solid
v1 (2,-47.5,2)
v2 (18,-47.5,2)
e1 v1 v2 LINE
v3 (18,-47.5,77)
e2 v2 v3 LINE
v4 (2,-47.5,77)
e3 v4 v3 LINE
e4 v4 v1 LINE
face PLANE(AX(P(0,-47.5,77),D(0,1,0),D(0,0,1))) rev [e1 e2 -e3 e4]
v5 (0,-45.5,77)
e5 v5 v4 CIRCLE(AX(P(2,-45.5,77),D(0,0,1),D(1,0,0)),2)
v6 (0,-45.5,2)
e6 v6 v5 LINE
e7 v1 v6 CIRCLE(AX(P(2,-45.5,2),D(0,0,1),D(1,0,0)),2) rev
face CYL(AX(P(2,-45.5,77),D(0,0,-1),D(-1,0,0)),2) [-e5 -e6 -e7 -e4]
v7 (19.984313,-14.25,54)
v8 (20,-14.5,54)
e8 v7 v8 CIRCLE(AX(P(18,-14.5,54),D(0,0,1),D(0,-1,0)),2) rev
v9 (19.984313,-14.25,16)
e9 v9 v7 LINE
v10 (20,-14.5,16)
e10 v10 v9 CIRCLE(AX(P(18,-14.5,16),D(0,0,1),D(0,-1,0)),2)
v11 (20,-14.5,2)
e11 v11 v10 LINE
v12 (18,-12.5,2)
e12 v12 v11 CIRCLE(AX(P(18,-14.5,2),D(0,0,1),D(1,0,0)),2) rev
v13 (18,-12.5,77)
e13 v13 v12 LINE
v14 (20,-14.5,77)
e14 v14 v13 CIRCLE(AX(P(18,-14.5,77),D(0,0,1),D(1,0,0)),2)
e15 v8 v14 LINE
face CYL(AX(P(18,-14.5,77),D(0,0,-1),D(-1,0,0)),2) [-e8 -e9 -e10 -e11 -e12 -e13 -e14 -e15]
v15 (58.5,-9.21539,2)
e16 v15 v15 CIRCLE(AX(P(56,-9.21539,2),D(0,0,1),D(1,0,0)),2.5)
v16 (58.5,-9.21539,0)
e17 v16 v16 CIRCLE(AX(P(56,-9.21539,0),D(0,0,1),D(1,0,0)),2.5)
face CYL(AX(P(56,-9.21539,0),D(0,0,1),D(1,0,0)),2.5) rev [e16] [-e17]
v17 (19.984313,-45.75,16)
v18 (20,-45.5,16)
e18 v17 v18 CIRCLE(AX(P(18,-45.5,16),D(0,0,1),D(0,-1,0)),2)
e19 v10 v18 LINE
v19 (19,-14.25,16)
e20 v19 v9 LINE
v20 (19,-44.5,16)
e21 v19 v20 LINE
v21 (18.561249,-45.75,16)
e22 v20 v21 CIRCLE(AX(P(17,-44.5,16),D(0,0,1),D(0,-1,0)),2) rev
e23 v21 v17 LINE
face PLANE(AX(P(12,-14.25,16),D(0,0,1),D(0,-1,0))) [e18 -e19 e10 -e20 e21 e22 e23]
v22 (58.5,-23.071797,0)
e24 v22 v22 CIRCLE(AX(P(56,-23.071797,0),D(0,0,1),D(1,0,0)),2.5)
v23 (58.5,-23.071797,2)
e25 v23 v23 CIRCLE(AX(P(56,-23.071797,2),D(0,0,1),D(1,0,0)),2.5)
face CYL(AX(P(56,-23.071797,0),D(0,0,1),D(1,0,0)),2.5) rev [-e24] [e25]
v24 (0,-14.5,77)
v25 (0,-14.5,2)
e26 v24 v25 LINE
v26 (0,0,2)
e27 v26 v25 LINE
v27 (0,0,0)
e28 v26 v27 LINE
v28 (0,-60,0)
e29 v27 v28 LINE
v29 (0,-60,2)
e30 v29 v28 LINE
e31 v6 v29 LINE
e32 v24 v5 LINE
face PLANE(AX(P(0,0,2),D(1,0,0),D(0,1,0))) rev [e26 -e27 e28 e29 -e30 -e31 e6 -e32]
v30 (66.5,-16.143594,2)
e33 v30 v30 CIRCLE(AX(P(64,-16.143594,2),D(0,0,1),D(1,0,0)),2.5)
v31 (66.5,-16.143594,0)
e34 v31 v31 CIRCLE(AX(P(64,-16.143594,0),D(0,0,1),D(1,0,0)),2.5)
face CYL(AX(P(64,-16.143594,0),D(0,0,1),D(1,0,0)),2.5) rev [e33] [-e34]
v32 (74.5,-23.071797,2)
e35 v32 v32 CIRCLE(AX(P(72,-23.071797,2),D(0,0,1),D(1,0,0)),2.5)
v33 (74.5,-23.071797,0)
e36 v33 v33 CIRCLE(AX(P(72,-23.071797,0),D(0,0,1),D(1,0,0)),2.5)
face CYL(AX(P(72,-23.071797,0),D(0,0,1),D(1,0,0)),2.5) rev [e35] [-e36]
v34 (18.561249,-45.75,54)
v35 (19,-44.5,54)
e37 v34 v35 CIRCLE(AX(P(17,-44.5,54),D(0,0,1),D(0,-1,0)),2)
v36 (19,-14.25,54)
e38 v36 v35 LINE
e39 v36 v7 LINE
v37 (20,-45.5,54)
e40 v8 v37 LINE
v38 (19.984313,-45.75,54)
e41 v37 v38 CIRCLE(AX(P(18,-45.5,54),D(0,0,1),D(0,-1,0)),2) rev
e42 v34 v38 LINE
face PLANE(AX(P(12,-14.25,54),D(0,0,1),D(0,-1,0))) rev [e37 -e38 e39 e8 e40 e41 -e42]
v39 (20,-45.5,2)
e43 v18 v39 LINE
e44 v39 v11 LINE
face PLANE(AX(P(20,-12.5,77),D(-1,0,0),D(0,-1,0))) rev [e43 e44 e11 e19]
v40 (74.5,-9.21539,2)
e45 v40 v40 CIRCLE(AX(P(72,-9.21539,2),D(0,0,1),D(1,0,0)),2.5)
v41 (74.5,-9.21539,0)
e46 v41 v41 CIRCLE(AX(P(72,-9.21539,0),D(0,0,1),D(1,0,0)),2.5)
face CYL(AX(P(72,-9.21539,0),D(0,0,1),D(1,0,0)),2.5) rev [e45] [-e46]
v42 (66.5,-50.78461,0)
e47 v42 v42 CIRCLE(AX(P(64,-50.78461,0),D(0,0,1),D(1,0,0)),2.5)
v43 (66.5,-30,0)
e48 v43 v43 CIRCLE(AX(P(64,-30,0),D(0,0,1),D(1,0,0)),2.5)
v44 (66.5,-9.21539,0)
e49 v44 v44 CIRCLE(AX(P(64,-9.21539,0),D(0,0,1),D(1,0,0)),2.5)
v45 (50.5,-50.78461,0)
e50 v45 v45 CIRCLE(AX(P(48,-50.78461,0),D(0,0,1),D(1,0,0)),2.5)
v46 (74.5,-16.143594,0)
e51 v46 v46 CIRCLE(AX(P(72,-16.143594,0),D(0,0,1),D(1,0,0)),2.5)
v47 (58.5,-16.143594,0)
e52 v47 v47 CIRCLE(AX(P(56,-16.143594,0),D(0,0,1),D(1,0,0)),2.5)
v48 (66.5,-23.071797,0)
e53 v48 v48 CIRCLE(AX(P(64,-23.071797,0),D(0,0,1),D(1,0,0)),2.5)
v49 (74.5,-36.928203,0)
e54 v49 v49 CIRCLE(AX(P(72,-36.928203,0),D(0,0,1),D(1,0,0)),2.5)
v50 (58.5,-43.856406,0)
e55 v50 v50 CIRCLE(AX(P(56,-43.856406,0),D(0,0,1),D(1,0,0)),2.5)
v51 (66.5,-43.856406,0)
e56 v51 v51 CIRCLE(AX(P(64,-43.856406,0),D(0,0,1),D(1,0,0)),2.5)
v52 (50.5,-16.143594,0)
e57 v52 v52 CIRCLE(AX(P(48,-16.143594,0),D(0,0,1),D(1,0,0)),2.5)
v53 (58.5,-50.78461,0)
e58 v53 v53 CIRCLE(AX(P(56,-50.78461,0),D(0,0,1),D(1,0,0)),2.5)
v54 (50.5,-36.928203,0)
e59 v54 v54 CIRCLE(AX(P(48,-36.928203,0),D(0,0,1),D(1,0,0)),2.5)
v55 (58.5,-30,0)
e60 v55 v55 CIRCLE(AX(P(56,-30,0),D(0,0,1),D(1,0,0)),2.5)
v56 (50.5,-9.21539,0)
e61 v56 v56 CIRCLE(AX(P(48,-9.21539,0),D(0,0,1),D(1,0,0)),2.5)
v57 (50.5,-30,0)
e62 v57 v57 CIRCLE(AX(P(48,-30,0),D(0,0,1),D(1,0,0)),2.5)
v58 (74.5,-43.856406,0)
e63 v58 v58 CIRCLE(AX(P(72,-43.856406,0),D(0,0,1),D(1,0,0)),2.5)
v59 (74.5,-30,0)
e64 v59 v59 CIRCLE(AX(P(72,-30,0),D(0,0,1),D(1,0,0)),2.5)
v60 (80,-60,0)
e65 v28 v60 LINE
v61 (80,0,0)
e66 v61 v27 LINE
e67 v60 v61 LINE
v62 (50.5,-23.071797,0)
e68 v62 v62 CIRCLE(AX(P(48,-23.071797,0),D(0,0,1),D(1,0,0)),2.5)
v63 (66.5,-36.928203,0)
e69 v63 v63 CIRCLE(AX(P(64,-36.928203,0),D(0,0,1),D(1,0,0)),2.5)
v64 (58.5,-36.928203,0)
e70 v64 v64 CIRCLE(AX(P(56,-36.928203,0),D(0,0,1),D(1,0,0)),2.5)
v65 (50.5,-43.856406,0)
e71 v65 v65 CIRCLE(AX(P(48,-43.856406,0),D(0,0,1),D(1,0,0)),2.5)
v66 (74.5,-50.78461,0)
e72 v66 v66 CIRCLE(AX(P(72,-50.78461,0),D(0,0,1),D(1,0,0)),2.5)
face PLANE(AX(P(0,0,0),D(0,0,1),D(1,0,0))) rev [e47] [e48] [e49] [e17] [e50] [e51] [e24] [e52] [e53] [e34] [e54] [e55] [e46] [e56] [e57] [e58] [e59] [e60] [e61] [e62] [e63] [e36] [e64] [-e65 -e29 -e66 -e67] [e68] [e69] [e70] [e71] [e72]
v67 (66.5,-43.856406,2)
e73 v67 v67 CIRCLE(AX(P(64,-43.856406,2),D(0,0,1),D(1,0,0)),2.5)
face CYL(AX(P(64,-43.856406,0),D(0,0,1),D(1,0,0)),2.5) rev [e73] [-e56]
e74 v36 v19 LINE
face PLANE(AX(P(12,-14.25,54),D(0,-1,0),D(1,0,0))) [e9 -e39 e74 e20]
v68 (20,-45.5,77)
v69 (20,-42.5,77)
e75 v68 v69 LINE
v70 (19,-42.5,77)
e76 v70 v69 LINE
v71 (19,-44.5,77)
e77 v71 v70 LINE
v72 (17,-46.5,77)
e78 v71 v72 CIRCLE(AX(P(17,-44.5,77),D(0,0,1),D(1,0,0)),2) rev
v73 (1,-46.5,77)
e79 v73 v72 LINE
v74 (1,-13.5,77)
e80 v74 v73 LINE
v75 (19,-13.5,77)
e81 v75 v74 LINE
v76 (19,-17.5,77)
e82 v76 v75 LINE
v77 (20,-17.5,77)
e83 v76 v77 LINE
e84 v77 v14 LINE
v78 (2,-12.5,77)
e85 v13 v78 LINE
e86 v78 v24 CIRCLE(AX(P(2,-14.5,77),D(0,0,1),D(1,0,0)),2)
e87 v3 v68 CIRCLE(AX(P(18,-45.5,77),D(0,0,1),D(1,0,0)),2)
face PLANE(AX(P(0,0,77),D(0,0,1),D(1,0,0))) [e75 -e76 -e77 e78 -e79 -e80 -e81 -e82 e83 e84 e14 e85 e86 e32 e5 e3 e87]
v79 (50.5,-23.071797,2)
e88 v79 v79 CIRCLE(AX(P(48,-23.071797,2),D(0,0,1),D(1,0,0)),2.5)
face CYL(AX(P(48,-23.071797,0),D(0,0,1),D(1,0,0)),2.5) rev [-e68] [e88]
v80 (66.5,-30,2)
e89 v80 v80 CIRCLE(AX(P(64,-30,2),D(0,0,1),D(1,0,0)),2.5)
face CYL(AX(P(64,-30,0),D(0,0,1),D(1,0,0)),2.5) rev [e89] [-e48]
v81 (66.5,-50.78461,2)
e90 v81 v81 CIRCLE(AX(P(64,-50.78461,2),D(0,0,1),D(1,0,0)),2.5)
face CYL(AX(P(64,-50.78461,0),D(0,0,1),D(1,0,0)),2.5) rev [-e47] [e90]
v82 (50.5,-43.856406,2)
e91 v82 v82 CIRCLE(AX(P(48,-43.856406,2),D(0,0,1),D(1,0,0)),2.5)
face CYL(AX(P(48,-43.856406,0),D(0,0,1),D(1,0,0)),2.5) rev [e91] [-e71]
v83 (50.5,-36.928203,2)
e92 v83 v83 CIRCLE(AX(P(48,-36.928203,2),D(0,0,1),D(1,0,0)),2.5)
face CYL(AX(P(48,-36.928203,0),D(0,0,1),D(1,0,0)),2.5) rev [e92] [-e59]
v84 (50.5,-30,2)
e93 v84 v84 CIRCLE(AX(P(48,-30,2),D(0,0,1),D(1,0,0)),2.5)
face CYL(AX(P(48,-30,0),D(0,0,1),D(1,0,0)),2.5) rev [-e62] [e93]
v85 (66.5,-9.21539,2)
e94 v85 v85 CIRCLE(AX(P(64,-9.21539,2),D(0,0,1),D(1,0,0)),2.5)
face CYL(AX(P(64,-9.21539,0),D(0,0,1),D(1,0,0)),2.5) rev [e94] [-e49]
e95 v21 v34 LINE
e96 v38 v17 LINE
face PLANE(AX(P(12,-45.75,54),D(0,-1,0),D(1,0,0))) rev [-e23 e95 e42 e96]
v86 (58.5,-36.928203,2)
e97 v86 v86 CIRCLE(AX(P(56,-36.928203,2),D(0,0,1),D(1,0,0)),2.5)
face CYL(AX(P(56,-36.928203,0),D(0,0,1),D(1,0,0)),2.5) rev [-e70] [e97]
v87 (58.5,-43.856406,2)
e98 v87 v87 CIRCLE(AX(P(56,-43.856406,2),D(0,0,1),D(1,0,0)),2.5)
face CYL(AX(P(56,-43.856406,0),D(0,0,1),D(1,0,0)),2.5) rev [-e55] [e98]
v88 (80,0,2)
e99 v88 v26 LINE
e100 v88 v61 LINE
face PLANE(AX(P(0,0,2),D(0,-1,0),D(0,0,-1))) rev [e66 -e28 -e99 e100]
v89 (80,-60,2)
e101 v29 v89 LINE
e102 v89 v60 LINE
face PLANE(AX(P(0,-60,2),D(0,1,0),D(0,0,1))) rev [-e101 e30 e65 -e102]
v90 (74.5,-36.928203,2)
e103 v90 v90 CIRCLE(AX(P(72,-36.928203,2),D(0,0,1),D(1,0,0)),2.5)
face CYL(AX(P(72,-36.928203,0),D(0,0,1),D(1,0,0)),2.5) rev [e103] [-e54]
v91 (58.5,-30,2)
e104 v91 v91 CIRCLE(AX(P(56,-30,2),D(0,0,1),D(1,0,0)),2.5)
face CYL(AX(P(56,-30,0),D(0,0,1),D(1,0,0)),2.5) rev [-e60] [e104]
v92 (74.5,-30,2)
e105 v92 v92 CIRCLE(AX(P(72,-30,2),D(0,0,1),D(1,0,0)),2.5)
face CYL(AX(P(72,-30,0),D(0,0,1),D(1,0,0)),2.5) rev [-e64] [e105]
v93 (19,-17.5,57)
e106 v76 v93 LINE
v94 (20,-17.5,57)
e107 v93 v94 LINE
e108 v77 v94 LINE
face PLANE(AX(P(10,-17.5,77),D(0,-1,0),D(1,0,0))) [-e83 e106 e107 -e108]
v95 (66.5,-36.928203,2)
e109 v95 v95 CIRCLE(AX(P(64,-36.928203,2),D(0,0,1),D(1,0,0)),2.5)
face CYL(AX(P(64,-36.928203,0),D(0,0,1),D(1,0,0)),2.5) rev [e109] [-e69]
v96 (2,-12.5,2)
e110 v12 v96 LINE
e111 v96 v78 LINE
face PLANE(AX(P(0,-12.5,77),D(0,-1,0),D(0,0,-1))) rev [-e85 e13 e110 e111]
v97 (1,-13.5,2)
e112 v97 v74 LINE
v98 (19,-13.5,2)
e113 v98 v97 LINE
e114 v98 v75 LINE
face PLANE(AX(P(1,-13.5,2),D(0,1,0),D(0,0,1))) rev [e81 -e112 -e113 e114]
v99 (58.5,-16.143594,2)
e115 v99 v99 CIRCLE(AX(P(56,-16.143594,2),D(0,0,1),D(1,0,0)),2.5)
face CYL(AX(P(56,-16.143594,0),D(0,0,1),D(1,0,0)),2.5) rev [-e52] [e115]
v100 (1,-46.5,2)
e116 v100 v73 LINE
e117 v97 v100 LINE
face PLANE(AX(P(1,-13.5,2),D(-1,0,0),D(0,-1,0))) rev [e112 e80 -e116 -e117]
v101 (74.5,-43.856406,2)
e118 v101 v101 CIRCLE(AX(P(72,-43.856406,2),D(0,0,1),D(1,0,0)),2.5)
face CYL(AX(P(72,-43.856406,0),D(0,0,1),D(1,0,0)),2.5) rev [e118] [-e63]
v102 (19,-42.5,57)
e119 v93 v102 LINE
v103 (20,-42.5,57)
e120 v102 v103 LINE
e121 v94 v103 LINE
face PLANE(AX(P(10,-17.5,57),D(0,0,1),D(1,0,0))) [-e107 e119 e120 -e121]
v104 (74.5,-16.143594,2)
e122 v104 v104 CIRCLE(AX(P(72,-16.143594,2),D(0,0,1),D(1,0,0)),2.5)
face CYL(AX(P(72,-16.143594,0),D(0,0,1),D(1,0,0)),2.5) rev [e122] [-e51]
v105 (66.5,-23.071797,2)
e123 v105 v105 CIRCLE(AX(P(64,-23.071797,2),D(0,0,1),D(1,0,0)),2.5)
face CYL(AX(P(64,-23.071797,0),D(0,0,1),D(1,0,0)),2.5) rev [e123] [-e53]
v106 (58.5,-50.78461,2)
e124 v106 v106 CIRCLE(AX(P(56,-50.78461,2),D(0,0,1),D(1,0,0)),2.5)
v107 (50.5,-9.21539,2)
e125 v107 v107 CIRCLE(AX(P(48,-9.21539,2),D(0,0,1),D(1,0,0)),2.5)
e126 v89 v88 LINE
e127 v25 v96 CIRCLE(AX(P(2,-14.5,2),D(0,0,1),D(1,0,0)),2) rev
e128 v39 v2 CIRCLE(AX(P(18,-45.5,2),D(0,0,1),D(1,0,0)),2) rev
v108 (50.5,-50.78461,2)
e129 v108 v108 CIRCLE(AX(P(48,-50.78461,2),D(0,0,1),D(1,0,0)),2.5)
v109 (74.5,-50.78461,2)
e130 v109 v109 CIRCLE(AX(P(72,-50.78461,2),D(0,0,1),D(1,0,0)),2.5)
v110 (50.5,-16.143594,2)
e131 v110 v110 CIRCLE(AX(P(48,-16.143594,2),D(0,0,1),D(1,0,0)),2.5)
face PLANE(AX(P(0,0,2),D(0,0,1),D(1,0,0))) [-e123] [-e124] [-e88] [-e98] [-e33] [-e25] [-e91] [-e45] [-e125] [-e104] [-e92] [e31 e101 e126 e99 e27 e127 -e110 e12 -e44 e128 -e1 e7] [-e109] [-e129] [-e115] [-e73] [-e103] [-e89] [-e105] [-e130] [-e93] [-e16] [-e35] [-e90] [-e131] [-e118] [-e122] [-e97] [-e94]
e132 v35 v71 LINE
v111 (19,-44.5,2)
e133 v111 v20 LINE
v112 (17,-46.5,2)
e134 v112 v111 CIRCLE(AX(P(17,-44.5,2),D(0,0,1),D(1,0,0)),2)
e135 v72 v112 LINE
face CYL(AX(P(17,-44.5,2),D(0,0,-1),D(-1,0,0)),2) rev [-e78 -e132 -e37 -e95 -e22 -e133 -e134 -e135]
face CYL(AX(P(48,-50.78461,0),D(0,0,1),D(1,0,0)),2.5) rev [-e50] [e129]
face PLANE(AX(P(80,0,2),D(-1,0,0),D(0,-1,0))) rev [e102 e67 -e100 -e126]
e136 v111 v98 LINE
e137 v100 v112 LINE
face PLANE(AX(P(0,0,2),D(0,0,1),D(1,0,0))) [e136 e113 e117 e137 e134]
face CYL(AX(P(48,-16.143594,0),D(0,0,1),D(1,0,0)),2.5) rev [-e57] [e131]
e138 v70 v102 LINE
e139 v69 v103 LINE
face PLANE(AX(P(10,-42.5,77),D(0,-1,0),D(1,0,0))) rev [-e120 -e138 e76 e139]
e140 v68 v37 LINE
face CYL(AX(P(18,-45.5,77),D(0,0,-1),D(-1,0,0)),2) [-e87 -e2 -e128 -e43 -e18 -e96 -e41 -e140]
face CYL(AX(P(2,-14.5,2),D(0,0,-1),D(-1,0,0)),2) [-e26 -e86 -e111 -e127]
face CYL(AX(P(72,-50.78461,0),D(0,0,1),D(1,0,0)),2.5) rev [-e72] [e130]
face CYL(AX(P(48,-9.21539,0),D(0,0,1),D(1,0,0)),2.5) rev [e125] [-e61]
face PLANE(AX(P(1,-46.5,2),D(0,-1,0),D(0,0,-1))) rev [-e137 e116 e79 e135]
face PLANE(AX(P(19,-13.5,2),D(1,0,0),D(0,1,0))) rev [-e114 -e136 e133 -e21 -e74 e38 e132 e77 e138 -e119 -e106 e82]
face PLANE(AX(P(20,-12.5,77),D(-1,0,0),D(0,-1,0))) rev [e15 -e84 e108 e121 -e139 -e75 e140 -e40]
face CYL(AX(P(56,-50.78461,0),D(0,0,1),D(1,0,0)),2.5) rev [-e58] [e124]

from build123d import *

# Parameters (mm, degrees)
SKETCH_1_W             = 80
SKETCH_1_H             = 60
EXTRUDE_1_DEPTH        = 2
SKETCH_3_R             = 2.5
HONEYCOMBCOOLING_DEPTH = 101.019998
SKETCH_4_W             = 20
SKETCH_4_H             = 35
EXTRUDE_2_DEPTH        = 75
SKETCH_5_W             = 18
SKETCH_5_H             = 33
CUT_EXTRUDE_3_DEPTH    = 75
SKETCH_6_W             = 38
SKETCH_6_H             = 31.5
CUT_EXTRUDE_4_DEPTH    = 8
SKETCH_9_W             = 20
SKETCH_9_H             = 25
CUT_EXTRUDE_5_DEPTH    = 10
FILLET_1_R             = 2
FILLET_2_R             = 2


with BuildPart() as part:
    # 草图1 → 凸台-拉伸1 (new body)
    with BuildSketch(Plane.XY):
        with Locations((40, -30)):
            Rectangle(SKETCH_1_W, SKETCH_1_H)
    extrude(amount=EXTRUDE_1_DEPTH)

    # 草图3 → HoneycombCooling (cut, through all)
    with BuildSketch(Plane.XY.offset(2)):
        with Locations((48, -50.784609691)):
            Circle(SKETCH_3_R)
        with Locations((56, -50.784609691)):
            Circle(SKETCH_3_R)
        with Locations((64, -50.784609691)):
            Circle(SKETCH_3_R)
        with Locations((72, -50.784609691)):
            Circle(SKETCH_3_R)
        with Locations((48, -43.856406461)):
            Circle(SKETCH_3_R)
        with Locations((56, -43.856406461)):
            Circle(SKETCH_3_R)
        with Locations((64, -43.856406461)):
            Circle(SKETCH_3_R)
        with Locations((72, -43.856406461)):
            Circle(SKETCH_3_R)
        with Locations((48, -36.92820323)):
            Circle(SKETCH_3_R)
        with Locations((56, -36.92820323)):
            Circle(SKETCH_3_R)
        with Locations((64, -36.92820323)):
            Circle(SKETCH_3_R)
        with Locations((72, -36.92820323)):
            Circle(SKETCH_3_R)
        with Locations((48, -30)):
            Circle(SKETCH_3_R)
        with Locations((56, -30)):
            Circle(SKETCH_3_R)
        with Locations((64, -30)):
            Circle(SKETCH_3_R)
        with Locations((72, -30)):
            Circle(SKETCH_3_R)
        with Locations((48, -23.07179677)):
            Circle(SKETCH_3_R)
        with Locations((56, -23.07179677)):
            Circle(SKETCH_3_R)
        with Locations((64, -23.07179677)):
            Circle(SKETCH_3_R)
        with Locations((72, -23.07179677)):
            Circle(SKETCH_3_R)
        with Locations((48, -16.143593539)):
            Circle(SKETCH_3_R)
        with Locations((56, -16.143593539)):
            Circle(SKETCH_3_R)
        with Locations((64, -16.143593539)):
            Circle(SKETCH_3_R)
        with Locations((72, -16.143593539)):
            Circle(SKETCH_3_R)
        with Locations((48, -9.215390309)):
            Circle(SKETCH_3_R)
        with Locations((56, -9.215390309)):
            Circle(SKETCH_3_R)
        with Locations((64, -9.215390309)):
            Circle(SKETCH_3_R)
        with Locations((72, -9.215390309)):
            Circle(SKETCH_3_R)
    extrude(amount=-HONEYCOMBCOOLING_DEPTH, mode=Mode.SUBTRACT)

    # 草图4 → 凸台-拉伸2 (add)
    with BuildSketch(Plane.XY.offset(2)):
        with Locations((10, -30)):
            Rectangle(SKETCH_4_W, SKETCH_4_H)
    extrude(amount=EXTRUDE_2_DEPTH)

    # 草图5 → 切除-拉伸3 (cut)
    with BuildSketch(Plane.XY.offset(77)):
        with Locations((10, -30)):
            Rectangle(SKETCH_5_W, SKETCH_5_H)
    extrude(amount=-CUT_EXTRUDE_3_DEPTH, mode=Mode.SUBTRACT)

    # 草图6 → 切除-拉伸4 (cut)
    with BuildSketch(Plane(origin=(20, 0, 0), x_dir=(0, 0, -1), z_dir=(1, 0, 0))):
        with Locations((-35, -30)):
            Rectangle(SKETCH_6_W, SKETCH_6_H)
    extrude(amount=-CUT_EXTRUDE_4_DEPTH, mode=Mode.SUBTRACT)

    # 草图9 → 切除-拉伸5 (cut)
    with BuildSketch(Plane(origin=(20, 0, 0), x_dir=(0, 0, -1), z_dir=(1, 0, 0))):
        with Locations((-67, -30)):
            Rectangle(SKETCH_9_W, SKETCH_9_H)
    extrude(amount=-CUT_EXTRUDE_5_DEPTH, mode=Mode.SUBTRACT)

    # 圆角1
    # the kernel refuses this fillet: 2 mm, written as the material it adds along each edge
    with BuildSketch(Plane(origin=(19, -46.5, 77), x_dir=(0, 1, 0), z_dir=(0, 0, -1))) as fillet_1_piece_1_section:
        with BuildLine():
            CenterArc((FILLET_1_R, -FILLET_1_R), FILLET_1_R, 90, 90)
            Line((0, -FILLET_1_R), (0, 0))
            Line((0, 0), (FILLET_1_R, 0))
        make_face()
    fillet_1_piece_1 = extrude(amount=80, mode=Mode.PRIVATE)
    fillet_1_piece_1 = split(fillet_1_piece_1, bisect_by=Plane(origin=(18.871282618, -45.444770831, 54), z_dir=(0, 0, 1)), keep=Keep.TOP, mode=Mode.PRIVATE)
    add(fillet_1_piece_1)
    with BuildSketch(Plane(origin=(19, -46.5, 82), x_dir=(0, 1, 0), z_dir=(0, 0, -1))) as fillet_1_piece_2_section:
        with BuildLine():
            CenterArc((FILLET_1_R, -FILLET_1_R), FILLET_1_R, 90, 90)
            Line((0, -FILLET_1_R), (0, 0))
            Line((0, 0), (FILLET_1_R, 0))
        make_face()
    fillet_1_piece_2 = extrude(amount=80, mode=Mode.PRIVATE)
    fillet_1_piece_2 = split(fillet_1_piece_2, bisect_by=Plane(origin=(18.472438473, -46.20791508, 54), z_dir=(0, 0, -1)), keep=Keep.TOP, mode=Mode.PRIVATE)
    fillet_1_piece_2 = split(fillet_1_piece_2, bisect_by=Plane(origin=(18.472438473, -45.75, 35), z_dir=(0, -1, 0)), keep=Keep.TOP, mode=Mode.PRIVATE)
    add(fillet_1_piece_2)
    with BuildSketch(Plane(origin=(19, -46.5, 82), x_dir=(0, 1, 0), z_dir=(0, 0, -1))) as fillet_1_piece_3_section:
        with BuildLine():
            CenterArc((FILLET_1_R, -FILLET_1_R), FILLET_1_R, 90, 90)
            Line((0, -FILLET_1_R), (0, 0))
            Line((0, 0), (FILLET_1_R, 0))
        make_face()
    fillet_1_piece_3 = extrude(amount=80, mode=Mode.PRIVATE)
    fillet_1_piece_3 = split(fillet_1_piece_3, bisect_by=Plane(origin=(18.871282618, -45.444770831, 16), z_dir=(0, 0, -1)), keep=Keep.TOP, mode=Mode.PRIVATE)
    add(fillet_1_piece_3)
    # the kernel refuses this fillet: 2 mm, written as the material it takes off along each edge
    with BuildSketch(Plane(origin=(0, -47.5, 2), x_dir=(1, 0, 0), z_dir=(0, 0, 1))) as fillet_1_2_piece_1:
        with BuildLine():
            CenterArc((FILLET_1_R, FILLET_1_R), FILLET_1_R, 180, 90)
            Line((0, FILLET_1_R), (0, 0))
            Line((0, 0), (FILLET_1_R, 0))
        make_face()
    extrude(amount=80, mode=Mode.SUBTRACT)
    with BuildSketch(Plane(origin=(0, -12.5, 2), x_dir=(1, 0, 0), z_dir=(0, 0, 1)), Plane(origin=(20, -12.5, 2), x_dir=(0, -1, 0), z_dir=(0, 0, 1))) as fillet_1_2_piece_2:
        with BuildLine():
            CenterArc((FILLET_1_R, -FILLET_1_R), FILLET_1_R, 90, 90)
            Line((0, -FILLET_1_R), (0, 0))
            Line((0, 0), (FILLET_1_R, 0))
        make_face()
    extrude(amount=80, mode=Mode.SUBTRACT)

    # 圆角2
    # the kernel refuses this fillet: 2 mm, written as the material it takes off along each edge
    with BuildSketch(Plane(origin=(20, -47.5, 2), x_dir=(-1, 0, 0), z_dir=(0, 0, 1))) as fillet_2_piece_1:
        with BuildLine():
            CenterArc((FILLET_2_R, -FILLET_2_R), FILLET_2_R, 90, 90)
            Line((0, -FILLET_2_R), (0, 0))
            Line((0, 0), (FILLET_2_R, 0))
        make_face()
    extrude(amount=80, mode=Mode.SUBTRACT)


solid = part.part
